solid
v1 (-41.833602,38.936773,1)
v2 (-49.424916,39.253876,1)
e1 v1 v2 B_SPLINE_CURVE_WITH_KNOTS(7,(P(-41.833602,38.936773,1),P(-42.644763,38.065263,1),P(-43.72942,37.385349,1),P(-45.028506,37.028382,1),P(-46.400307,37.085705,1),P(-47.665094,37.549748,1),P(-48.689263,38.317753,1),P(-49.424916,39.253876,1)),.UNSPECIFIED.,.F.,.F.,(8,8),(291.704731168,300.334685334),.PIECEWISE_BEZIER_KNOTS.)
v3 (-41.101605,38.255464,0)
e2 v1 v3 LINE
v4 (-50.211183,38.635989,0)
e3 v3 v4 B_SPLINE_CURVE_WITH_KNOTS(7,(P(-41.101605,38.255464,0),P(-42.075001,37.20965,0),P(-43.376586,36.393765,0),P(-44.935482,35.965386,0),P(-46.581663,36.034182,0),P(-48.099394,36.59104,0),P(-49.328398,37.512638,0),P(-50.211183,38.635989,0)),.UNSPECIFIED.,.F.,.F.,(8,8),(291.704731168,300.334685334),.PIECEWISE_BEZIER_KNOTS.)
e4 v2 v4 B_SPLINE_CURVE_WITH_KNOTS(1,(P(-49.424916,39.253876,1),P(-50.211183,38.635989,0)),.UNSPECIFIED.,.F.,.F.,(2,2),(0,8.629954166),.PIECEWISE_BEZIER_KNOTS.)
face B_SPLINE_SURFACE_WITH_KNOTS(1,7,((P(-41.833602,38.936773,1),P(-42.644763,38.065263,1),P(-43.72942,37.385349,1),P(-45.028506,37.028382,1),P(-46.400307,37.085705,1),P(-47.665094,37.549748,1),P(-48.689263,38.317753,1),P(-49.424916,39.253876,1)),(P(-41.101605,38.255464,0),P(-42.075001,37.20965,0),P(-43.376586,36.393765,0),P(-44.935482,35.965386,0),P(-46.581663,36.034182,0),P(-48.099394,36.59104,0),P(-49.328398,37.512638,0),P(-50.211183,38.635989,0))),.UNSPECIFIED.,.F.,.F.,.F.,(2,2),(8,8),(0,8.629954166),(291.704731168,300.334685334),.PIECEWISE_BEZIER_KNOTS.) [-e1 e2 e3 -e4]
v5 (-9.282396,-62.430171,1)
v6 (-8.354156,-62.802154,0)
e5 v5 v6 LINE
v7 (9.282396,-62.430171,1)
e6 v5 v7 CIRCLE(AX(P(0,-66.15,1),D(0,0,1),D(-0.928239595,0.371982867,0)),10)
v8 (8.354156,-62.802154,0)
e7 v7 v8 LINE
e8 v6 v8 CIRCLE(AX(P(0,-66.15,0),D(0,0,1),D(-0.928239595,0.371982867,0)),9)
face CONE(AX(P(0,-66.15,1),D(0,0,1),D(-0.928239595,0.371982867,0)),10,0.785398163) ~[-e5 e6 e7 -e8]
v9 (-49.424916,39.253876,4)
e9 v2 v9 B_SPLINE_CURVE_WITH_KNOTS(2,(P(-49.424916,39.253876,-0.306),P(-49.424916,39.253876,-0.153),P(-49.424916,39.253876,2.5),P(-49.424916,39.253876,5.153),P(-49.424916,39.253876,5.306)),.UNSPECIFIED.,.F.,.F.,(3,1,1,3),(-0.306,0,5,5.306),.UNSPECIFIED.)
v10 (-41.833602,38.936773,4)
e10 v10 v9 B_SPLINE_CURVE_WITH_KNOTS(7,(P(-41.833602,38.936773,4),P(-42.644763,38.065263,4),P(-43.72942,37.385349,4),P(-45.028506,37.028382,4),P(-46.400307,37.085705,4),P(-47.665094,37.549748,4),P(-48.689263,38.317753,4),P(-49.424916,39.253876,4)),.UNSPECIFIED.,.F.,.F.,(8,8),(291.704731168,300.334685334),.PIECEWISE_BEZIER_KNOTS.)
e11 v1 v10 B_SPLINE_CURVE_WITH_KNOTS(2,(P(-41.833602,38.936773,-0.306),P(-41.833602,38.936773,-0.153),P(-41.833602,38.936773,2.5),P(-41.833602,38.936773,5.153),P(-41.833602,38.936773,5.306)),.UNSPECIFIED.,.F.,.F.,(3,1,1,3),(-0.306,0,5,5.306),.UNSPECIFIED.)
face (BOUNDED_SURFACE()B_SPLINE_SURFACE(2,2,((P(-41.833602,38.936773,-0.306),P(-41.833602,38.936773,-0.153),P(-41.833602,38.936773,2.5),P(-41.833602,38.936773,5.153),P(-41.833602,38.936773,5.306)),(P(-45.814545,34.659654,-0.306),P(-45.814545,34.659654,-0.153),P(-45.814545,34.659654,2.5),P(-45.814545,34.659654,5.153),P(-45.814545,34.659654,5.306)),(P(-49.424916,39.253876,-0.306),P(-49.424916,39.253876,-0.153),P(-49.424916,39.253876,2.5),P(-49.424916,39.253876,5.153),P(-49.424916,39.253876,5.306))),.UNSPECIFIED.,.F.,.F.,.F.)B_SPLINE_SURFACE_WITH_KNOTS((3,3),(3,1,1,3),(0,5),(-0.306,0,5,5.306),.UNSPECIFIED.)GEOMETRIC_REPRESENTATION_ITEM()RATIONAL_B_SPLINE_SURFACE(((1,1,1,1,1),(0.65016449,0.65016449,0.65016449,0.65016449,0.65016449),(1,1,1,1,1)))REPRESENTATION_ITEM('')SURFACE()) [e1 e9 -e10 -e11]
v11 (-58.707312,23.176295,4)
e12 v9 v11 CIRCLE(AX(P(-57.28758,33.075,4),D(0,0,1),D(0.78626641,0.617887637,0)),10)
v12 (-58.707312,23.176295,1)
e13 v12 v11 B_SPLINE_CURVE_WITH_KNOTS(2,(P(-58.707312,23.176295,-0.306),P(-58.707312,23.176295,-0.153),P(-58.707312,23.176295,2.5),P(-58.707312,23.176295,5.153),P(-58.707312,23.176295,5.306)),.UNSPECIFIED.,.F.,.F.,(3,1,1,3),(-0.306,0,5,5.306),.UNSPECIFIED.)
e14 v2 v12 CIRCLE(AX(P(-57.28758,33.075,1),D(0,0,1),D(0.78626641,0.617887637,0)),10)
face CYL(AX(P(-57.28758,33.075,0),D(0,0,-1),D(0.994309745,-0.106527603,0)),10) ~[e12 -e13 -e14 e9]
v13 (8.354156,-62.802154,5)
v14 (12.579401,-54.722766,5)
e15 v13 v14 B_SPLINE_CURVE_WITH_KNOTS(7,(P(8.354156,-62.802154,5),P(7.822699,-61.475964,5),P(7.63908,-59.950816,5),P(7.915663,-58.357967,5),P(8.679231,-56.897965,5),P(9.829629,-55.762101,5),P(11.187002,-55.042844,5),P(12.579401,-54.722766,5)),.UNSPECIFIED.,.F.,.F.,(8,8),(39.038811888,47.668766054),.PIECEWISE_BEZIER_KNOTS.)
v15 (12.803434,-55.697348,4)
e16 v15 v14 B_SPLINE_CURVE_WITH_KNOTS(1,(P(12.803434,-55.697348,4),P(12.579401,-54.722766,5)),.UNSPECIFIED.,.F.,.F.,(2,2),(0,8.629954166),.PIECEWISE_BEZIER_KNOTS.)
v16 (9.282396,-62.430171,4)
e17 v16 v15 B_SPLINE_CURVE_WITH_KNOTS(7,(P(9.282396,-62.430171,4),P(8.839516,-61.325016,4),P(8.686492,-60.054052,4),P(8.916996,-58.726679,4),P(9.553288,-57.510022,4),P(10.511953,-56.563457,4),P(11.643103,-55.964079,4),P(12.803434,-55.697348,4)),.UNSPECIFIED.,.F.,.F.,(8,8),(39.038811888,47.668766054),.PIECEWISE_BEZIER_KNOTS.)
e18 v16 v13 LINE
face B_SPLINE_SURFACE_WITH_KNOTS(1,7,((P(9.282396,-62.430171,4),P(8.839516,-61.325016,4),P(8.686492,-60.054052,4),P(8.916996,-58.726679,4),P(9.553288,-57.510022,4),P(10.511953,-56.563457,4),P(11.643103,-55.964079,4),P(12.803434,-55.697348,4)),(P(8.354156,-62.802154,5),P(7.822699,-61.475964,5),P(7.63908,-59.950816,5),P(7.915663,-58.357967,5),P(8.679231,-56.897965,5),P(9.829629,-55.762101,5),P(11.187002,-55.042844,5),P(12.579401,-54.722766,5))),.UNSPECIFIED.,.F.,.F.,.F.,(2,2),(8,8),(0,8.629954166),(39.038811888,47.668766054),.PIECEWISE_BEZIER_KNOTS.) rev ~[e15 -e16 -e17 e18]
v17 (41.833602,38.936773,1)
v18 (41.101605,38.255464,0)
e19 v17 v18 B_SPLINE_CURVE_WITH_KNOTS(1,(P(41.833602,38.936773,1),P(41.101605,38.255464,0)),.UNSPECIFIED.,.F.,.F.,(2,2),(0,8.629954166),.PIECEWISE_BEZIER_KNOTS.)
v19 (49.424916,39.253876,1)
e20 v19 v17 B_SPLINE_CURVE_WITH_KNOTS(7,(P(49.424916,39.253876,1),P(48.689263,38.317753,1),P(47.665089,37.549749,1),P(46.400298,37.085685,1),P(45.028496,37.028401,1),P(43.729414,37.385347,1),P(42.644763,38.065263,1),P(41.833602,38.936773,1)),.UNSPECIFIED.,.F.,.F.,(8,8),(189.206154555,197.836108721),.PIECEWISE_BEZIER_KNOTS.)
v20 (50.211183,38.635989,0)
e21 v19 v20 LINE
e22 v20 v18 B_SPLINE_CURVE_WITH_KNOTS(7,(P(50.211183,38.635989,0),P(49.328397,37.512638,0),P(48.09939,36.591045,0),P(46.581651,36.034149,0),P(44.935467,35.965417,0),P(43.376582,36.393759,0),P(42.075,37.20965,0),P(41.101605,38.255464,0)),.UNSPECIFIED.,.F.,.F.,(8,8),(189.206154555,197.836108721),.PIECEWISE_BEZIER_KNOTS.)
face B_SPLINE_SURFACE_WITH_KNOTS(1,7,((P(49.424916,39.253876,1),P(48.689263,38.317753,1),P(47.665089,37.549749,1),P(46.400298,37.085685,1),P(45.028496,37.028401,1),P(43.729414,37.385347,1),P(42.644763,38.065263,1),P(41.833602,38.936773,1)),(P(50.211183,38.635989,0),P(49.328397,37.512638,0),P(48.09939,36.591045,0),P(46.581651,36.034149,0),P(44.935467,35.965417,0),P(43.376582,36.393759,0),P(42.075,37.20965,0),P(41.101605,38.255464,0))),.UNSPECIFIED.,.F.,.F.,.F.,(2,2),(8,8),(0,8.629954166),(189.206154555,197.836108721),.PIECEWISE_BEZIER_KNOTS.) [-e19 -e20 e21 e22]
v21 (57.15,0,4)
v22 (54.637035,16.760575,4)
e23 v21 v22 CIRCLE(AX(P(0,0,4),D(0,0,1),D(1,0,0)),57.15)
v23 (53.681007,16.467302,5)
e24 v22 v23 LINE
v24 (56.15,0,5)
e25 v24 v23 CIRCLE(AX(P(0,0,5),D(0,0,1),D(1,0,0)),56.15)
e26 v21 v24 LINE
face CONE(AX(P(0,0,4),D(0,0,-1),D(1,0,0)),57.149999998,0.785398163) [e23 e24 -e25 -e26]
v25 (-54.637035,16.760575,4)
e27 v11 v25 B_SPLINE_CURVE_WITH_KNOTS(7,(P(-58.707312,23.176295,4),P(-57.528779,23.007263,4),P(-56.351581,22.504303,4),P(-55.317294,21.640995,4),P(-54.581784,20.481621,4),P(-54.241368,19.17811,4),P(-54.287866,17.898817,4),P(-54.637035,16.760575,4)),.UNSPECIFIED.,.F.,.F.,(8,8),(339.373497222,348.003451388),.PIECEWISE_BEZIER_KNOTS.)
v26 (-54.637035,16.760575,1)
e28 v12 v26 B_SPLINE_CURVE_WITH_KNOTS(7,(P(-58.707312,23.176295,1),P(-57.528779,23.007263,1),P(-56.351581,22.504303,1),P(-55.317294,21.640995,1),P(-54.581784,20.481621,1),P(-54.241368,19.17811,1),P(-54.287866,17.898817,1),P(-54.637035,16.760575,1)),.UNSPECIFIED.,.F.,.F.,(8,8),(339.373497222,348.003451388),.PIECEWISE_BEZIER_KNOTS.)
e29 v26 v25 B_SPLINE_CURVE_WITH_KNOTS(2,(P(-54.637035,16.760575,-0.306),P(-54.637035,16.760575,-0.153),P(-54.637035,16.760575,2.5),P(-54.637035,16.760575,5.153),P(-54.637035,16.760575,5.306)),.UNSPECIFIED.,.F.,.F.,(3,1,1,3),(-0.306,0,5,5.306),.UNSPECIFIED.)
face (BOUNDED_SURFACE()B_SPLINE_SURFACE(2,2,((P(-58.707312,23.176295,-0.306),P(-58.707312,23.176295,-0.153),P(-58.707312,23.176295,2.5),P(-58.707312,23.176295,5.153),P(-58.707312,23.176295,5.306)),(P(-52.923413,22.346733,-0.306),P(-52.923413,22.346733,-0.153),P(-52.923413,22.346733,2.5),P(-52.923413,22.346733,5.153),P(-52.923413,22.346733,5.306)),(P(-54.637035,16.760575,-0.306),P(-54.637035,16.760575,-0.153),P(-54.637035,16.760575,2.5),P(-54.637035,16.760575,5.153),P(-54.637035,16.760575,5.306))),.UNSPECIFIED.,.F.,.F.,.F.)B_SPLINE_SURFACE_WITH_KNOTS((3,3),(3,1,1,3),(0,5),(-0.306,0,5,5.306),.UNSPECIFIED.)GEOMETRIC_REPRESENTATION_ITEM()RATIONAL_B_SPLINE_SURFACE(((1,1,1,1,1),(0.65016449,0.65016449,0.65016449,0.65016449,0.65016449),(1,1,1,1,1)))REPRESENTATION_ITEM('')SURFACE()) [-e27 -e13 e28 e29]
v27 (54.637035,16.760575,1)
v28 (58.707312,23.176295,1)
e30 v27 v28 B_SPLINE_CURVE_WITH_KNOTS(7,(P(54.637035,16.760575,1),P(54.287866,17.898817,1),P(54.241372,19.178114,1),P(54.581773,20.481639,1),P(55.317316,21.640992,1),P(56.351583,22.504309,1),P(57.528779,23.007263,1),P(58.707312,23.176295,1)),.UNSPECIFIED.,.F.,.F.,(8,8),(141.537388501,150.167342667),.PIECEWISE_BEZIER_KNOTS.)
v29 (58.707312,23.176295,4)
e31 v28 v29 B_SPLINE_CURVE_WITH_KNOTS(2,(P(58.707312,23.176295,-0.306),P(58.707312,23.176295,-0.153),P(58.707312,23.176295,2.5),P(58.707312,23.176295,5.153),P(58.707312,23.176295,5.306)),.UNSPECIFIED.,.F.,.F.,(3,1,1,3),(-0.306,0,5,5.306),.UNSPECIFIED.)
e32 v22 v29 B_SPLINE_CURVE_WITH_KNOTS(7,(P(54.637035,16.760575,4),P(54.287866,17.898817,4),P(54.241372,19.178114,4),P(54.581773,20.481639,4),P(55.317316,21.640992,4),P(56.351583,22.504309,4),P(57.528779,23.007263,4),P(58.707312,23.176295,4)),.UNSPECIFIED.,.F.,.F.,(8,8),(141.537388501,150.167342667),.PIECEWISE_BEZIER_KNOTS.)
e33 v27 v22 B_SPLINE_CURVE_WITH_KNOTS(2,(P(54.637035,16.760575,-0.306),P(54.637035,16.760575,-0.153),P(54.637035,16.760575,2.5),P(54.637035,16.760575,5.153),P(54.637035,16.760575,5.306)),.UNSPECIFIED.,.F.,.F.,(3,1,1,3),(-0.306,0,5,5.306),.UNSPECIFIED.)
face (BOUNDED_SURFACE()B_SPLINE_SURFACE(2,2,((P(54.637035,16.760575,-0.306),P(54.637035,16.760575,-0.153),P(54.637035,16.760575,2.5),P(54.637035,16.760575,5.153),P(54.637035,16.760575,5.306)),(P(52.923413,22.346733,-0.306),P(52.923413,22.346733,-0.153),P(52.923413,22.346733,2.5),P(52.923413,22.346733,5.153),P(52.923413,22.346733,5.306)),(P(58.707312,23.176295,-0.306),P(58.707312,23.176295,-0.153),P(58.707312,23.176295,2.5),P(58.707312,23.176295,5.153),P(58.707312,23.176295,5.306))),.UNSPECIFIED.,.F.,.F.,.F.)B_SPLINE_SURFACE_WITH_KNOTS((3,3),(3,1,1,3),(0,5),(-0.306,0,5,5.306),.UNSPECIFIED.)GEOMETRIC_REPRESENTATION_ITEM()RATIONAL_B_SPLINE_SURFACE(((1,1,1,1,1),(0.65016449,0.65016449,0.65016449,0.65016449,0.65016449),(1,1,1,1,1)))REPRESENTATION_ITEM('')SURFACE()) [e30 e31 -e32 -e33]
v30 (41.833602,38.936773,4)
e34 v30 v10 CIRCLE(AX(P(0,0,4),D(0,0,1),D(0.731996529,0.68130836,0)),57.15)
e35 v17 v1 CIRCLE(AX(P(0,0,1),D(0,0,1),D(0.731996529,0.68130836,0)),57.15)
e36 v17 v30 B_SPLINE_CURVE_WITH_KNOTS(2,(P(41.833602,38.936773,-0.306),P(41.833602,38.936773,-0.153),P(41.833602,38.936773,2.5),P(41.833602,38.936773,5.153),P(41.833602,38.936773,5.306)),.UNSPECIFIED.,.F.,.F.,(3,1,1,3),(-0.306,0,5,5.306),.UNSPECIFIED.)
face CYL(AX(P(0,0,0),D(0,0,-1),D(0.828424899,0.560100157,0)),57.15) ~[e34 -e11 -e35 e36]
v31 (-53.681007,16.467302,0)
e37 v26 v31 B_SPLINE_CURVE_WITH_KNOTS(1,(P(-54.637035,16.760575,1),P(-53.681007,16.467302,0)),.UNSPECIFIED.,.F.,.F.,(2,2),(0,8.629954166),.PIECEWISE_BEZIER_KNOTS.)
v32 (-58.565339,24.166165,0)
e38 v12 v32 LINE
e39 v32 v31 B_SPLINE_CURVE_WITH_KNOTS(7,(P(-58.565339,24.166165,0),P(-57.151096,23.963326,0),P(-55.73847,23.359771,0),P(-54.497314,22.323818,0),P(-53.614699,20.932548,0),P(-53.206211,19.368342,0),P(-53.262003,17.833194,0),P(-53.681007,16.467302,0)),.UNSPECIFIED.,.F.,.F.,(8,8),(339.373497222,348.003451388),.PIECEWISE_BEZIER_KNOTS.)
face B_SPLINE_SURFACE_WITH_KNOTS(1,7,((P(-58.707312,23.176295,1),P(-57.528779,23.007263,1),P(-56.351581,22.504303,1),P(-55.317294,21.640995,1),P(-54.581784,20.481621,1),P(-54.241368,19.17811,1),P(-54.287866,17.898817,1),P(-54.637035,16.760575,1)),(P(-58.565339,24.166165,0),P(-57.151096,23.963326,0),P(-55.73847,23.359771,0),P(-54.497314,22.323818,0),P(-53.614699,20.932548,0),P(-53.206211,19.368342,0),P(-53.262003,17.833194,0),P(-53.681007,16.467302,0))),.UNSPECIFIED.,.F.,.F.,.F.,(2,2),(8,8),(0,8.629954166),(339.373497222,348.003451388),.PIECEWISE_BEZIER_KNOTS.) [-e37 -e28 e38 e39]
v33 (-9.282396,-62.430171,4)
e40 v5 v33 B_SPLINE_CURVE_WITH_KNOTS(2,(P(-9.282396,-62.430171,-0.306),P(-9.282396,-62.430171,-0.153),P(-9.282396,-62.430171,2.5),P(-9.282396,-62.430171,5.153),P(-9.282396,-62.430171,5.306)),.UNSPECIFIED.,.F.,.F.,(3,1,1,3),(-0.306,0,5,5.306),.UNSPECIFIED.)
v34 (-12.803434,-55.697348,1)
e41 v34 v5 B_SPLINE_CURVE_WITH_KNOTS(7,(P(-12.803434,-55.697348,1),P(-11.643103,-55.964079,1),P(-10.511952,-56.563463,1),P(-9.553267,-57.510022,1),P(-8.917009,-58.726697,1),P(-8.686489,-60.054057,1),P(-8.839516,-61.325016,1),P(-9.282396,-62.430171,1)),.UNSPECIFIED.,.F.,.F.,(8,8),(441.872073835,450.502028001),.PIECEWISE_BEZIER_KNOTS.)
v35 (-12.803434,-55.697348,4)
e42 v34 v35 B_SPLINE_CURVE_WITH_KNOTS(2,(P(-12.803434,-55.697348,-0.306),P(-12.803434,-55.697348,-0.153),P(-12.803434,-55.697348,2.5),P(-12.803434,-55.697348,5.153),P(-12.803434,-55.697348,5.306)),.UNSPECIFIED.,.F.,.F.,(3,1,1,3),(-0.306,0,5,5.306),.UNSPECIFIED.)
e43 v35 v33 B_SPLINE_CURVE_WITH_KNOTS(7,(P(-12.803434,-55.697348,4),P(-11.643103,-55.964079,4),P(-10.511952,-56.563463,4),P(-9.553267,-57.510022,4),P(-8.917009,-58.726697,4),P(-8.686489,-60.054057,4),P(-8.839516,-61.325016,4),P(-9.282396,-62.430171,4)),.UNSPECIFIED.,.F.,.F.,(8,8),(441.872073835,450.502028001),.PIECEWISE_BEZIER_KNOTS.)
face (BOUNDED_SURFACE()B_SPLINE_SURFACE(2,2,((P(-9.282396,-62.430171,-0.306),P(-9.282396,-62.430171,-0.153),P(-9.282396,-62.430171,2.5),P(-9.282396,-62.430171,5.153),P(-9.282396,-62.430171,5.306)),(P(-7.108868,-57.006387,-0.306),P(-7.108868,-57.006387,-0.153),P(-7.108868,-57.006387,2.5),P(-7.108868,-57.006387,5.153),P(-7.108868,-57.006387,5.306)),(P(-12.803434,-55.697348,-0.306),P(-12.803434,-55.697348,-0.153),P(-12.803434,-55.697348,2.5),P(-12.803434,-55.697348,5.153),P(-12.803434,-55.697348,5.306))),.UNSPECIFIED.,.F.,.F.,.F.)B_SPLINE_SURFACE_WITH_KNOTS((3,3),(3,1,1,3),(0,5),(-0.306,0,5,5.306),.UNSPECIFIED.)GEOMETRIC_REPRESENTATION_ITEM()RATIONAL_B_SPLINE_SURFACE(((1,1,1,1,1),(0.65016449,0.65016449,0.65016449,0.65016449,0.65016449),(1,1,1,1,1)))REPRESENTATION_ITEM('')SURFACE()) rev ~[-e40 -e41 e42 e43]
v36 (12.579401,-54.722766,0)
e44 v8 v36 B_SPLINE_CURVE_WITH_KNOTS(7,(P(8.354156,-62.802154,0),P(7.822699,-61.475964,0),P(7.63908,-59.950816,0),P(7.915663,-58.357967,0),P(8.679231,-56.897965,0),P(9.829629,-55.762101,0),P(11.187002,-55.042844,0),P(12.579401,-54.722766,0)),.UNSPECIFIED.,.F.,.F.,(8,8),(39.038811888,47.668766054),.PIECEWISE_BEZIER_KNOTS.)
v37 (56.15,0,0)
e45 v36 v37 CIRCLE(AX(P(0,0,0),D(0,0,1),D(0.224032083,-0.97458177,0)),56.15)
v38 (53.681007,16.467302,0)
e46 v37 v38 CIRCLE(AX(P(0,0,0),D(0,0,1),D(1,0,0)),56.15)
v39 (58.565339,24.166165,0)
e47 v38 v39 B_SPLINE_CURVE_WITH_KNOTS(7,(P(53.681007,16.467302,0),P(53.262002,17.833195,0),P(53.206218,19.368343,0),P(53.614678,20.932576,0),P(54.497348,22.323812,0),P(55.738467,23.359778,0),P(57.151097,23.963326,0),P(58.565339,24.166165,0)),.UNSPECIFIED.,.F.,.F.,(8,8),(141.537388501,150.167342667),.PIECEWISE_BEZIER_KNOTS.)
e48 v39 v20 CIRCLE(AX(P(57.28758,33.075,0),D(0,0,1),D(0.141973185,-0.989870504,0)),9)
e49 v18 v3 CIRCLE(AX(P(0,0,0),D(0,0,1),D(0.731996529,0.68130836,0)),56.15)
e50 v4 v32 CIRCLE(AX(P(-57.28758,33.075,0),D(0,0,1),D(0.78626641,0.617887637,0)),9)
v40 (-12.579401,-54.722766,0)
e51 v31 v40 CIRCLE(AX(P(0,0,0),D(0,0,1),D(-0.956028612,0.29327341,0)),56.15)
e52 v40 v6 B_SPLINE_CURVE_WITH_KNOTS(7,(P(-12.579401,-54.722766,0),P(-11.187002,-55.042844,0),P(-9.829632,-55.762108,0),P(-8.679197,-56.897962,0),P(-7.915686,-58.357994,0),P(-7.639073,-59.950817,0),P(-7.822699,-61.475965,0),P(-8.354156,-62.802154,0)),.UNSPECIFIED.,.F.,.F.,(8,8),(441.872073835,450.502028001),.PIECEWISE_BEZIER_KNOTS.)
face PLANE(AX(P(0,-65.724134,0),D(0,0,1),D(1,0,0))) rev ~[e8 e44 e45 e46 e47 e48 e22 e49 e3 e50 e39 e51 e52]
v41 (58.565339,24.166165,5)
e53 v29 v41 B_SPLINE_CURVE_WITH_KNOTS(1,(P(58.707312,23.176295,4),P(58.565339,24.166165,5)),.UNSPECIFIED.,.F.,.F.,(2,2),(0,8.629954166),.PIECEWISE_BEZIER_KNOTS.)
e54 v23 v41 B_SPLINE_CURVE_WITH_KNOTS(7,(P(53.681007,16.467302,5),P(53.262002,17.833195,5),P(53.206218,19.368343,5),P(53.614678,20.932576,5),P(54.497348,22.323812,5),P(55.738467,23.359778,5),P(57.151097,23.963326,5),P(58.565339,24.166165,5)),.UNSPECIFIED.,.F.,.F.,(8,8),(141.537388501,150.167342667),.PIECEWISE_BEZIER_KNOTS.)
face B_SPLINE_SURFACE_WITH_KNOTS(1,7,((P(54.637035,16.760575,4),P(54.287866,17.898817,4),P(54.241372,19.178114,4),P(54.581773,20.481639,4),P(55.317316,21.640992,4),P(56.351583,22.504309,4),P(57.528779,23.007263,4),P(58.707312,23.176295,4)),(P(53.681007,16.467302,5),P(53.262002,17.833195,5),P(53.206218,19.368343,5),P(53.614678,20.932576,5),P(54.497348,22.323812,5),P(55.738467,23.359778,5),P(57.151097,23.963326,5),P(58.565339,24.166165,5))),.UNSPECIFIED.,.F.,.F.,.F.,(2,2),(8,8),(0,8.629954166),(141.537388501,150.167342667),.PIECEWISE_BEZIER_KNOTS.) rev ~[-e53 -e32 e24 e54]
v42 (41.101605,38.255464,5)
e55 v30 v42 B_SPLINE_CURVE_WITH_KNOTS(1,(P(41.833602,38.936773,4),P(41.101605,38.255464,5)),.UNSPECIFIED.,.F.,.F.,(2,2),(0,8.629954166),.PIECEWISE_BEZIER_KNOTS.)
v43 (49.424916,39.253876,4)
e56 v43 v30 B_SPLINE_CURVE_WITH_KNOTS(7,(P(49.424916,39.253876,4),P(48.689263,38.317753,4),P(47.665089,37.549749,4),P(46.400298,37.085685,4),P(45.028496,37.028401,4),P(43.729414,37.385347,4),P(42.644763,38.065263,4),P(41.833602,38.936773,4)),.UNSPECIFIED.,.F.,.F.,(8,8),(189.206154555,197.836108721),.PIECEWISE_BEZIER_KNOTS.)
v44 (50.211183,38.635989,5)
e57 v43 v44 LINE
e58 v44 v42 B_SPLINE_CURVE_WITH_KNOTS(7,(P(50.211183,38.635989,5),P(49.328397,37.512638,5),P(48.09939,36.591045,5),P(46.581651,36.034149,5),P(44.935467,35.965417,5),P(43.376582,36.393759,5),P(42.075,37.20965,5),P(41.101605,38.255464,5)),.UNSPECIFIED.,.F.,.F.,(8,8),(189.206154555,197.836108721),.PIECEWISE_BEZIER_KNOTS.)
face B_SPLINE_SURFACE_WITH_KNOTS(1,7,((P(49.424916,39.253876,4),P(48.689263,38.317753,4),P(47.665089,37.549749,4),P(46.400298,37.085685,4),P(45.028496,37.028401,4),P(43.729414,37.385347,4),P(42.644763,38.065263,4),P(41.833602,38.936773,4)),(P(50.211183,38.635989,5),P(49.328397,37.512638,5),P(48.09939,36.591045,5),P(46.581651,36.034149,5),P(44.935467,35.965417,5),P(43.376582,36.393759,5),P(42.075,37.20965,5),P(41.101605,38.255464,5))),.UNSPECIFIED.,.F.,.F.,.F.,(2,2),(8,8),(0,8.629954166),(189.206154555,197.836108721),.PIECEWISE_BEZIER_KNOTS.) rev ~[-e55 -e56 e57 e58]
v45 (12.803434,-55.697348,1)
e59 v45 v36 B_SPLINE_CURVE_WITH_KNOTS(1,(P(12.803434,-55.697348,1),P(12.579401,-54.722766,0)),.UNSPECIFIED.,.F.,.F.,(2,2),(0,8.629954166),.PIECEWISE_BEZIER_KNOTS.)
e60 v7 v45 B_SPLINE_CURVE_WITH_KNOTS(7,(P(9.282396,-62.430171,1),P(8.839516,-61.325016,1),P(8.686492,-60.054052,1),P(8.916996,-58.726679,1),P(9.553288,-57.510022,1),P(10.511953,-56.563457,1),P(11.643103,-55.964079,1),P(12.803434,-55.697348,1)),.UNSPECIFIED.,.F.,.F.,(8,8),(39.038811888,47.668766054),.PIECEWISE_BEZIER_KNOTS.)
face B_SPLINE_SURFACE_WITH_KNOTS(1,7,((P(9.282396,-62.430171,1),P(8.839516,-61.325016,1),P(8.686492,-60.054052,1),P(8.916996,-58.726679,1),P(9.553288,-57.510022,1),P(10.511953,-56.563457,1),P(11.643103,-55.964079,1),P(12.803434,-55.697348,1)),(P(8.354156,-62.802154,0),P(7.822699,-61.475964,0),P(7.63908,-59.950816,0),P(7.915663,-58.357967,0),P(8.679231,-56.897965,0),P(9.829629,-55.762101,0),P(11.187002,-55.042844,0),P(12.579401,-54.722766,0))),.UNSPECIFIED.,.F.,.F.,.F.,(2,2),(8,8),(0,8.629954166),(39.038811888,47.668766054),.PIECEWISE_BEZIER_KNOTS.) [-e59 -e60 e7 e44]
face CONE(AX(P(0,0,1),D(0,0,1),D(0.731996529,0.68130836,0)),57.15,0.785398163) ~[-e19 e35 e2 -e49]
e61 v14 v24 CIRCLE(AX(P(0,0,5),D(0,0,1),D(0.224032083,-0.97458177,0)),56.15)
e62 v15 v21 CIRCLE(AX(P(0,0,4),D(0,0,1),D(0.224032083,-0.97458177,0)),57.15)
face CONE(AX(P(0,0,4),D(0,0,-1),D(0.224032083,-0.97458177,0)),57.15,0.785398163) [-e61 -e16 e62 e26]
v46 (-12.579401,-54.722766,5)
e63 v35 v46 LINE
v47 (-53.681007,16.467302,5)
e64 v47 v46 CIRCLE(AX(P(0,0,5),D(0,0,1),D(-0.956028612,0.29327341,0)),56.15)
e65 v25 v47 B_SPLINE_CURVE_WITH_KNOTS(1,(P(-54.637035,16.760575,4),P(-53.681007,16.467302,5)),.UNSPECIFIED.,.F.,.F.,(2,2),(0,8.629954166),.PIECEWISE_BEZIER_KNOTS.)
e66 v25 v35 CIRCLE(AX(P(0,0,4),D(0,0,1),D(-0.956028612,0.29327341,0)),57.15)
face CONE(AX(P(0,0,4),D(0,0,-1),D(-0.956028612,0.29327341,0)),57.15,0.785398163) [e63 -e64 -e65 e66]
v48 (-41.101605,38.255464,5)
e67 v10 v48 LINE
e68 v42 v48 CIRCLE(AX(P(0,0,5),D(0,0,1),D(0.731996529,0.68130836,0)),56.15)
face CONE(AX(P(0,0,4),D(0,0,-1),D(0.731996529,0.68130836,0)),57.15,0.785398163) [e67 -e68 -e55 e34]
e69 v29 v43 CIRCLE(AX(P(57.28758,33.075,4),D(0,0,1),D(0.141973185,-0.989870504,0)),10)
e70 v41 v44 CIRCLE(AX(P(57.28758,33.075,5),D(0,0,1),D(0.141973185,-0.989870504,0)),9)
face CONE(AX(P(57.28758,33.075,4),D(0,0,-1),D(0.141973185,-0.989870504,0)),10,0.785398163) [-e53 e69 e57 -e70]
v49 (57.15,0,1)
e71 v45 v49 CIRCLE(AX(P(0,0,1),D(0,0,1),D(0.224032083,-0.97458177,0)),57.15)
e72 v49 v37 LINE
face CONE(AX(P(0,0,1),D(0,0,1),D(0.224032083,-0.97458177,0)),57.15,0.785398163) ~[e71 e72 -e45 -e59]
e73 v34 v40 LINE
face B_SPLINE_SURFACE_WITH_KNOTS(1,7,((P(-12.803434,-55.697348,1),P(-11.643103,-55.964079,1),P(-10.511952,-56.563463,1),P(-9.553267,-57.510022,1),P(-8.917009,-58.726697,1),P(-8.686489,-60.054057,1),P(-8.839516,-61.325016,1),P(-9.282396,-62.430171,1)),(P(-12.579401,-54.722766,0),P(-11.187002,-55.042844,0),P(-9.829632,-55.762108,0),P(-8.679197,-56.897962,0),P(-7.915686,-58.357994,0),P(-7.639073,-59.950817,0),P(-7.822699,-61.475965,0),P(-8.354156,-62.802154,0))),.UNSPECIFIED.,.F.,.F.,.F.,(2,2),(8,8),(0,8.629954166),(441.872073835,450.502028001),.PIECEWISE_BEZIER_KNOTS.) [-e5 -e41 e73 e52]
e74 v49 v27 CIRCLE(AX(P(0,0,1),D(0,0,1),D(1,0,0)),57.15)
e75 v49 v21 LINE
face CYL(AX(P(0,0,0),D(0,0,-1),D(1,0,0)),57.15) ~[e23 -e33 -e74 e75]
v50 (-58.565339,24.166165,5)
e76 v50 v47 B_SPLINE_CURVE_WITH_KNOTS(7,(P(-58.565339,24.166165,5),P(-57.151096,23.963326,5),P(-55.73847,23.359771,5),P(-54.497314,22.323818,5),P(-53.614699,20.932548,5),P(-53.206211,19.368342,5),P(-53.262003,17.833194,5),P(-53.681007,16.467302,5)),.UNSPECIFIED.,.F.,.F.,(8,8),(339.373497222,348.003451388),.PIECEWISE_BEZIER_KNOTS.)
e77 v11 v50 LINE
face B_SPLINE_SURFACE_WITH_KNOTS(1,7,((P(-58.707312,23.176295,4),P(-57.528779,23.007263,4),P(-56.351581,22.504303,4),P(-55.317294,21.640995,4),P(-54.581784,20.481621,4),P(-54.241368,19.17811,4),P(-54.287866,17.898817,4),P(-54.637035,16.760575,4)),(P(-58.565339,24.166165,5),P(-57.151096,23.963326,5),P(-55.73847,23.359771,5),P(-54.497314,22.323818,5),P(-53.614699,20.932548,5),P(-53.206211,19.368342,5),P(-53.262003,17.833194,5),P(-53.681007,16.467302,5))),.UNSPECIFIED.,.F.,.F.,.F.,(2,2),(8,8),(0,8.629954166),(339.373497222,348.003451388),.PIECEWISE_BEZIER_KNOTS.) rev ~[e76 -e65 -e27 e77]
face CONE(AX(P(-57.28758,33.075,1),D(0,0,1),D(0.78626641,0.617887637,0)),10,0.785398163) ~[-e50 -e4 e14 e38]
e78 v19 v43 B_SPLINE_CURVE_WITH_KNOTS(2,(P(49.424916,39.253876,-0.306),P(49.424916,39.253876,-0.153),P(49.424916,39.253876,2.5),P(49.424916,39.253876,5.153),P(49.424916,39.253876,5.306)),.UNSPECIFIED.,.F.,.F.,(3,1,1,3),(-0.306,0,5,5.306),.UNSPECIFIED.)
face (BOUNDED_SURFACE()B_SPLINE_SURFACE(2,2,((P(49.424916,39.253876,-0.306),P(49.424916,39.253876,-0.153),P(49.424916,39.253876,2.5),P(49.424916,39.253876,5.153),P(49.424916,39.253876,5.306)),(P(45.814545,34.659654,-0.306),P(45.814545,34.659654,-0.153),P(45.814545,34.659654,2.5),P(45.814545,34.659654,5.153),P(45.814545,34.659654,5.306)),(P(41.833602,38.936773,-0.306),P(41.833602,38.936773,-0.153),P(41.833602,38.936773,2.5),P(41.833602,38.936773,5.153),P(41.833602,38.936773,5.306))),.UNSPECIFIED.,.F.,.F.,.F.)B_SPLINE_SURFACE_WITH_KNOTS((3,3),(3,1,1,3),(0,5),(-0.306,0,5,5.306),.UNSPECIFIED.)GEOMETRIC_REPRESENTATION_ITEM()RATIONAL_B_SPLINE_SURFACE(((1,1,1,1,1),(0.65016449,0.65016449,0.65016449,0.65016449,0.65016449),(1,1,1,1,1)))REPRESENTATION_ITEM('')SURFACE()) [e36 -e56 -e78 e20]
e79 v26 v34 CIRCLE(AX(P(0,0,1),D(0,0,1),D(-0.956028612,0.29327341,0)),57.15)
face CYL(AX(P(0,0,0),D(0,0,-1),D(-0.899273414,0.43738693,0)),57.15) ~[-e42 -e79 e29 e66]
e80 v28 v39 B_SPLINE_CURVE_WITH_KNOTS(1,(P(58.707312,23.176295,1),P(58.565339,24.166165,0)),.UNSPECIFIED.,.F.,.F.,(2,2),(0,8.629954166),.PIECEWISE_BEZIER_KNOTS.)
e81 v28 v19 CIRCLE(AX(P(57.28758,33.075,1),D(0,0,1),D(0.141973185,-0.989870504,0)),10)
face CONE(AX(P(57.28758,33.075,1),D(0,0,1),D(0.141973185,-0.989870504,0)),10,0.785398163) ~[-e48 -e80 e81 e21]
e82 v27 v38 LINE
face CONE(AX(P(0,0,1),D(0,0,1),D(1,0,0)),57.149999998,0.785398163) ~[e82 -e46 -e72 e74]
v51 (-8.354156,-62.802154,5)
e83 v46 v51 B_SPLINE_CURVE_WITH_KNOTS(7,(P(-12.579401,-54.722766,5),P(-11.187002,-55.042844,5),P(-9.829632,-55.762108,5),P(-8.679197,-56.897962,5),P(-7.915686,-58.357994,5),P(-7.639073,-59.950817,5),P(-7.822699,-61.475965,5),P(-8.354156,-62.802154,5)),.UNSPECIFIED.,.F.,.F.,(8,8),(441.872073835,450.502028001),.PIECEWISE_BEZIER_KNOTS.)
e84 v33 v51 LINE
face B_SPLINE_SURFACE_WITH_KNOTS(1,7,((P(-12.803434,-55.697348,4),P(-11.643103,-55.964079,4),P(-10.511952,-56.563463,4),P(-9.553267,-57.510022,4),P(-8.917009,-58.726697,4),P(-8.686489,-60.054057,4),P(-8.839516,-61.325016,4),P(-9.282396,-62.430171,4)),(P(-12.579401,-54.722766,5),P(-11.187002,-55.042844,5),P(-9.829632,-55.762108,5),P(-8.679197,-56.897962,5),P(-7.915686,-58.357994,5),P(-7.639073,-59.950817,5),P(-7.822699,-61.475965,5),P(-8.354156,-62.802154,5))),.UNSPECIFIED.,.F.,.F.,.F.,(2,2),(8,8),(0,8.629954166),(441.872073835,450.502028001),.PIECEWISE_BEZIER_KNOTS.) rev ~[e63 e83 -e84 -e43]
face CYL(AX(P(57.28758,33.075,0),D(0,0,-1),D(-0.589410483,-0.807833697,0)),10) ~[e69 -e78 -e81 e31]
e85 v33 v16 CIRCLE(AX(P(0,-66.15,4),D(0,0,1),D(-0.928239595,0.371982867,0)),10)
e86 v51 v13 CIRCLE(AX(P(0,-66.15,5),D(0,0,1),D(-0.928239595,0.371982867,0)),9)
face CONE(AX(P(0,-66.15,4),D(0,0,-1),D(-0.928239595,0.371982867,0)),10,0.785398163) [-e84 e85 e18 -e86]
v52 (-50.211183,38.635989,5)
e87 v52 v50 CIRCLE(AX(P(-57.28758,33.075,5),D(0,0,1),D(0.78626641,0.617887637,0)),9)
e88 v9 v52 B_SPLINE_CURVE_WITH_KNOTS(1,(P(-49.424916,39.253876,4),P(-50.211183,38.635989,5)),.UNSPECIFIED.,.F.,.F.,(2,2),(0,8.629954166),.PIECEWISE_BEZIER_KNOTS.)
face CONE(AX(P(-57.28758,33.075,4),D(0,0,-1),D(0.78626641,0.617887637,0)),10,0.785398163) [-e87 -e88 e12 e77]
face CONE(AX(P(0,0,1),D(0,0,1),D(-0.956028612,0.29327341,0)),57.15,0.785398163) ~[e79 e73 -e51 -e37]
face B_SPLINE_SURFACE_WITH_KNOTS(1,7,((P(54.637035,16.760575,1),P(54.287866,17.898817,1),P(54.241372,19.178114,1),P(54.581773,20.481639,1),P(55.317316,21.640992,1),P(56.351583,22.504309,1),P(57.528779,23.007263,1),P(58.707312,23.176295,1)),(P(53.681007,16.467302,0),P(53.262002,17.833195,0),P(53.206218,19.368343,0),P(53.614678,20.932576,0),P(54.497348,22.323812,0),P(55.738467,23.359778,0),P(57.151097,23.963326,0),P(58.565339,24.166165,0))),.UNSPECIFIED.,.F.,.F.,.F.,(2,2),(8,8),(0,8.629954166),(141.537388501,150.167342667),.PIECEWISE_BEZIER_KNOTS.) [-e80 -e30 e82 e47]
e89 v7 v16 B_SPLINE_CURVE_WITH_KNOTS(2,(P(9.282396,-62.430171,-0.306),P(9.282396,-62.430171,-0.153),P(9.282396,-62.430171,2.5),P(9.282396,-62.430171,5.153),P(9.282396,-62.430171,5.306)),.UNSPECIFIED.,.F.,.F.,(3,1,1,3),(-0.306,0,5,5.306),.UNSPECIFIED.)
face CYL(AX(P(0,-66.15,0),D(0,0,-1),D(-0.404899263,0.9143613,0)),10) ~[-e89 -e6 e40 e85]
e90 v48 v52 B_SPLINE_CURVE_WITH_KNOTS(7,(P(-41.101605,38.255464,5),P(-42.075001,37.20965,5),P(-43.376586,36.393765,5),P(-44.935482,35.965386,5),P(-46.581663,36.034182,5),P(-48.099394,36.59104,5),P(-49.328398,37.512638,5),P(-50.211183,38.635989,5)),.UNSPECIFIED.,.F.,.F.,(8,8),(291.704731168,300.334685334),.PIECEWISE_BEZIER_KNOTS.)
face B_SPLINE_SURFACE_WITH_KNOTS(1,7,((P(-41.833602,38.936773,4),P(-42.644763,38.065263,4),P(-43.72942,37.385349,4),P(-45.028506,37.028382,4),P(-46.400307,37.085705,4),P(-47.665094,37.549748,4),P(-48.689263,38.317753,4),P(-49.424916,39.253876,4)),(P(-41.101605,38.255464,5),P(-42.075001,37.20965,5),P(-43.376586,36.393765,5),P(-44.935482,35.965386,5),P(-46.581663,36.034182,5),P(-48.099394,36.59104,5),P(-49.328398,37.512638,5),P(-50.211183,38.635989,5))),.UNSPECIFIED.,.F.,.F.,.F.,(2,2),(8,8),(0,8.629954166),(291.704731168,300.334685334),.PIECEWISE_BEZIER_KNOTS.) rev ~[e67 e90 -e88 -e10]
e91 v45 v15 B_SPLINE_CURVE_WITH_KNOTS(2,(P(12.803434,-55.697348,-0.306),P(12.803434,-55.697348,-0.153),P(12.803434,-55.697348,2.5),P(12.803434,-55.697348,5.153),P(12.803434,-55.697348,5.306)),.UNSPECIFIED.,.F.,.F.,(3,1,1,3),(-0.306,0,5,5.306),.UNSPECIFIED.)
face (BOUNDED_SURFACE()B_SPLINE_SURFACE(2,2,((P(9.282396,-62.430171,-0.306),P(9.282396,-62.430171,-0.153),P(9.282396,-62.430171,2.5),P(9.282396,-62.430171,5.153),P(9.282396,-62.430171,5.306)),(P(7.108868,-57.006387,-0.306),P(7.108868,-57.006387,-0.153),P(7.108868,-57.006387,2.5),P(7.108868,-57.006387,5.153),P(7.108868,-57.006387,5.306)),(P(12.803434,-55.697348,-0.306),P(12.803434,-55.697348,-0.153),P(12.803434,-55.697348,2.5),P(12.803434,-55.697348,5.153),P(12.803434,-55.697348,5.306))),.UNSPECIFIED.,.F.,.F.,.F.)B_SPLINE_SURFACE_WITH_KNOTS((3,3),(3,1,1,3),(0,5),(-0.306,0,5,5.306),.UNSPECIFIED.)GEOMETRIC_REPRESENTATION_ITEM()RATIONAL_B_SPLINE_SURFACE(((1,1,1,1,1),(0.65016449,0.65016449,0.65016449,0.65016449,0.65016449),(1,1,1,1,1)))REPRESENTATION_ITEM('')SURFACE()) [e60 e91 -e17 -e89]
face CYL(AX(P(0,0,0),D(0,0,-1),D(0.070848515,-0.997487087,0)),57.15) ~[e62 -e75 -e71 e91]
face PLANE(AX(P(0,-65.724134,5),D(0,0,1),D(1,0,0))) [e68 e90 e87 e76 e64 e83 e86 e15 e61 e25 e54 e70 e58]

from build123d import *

# Parameters (mm, degrees)
F1_DEPTH = 5
F2_R     = 5
F3_SIZE  = 1


with BuildPart() as f1:
    # F0 (on Top) → F1 (new body)
    with BuildSketch(Plane.XY):
        with BuildLine():
            ThreePointArc((-4.0489926269, -57.0063869992), (0, -76.15), (4.0489926269, -57.0063869992))
            ThreePointArc((4.0489926269, -57.0063869992), (0, -57.15), (-4.0489926269, -57.0063869992))
        make_face()
        with BuildLine():
            ThreePointArc((4.0489926269, -57.0063869992), (41.8181923846, -38.9533218826), (57.15, 0))
            ThreePointArc((57.15, 0), (55.6922778867, 12.8254701198), (51.3934756327, 24.996663025))
            ThreePointArc((51.3934756327, 24.996663025), (49.4933518263, 28.575), (47.3444830059, 32.0097239742))
            ThreePointArc((47.3444830059, 32.0097239742), (0, 57.15), (-47.3444830059, 32.0097239742))
            ThreePointArc((-47.3444830059, 32.0097239742), (-49.4933518263, 28.575), (-51.3934756327, 24.996663025))
            ThreePointArc((-51.3934756327, 24.996663025), (-49.4933518263, -28.575), (-4.0489926269, -57.0063869992))
            ThreePointArc((-4.0489926269, -57.0063869992), (0, -57.15), (4.0489926269, -57.0063869992))
        make_face()
        with BuildLine():
            ThreePointArc((-51.3934756327, 24.996663025), (-49.4933518263, 28.575), (-47.3444830059, 32.0097239742))
            ThreePointArc((-47.3444830059, 32.0097239742), (-65.9478344982, 38.075), (-51.3934756327, 24.996663025))
        make_face()
        with BuildLine():
            ThreePointArc((47.3444830059, 32.0097239742), (49.4933518263, 28.575), (51.3934756327, 24.996663025))
            ThreePointArc((51.3934756327, 24.996663025), (65.9478344982, 38.075), (47.3444830059, 32.0097239742))
        make_face()
    extrude(amount=F1_DEPTH)

    # F2
    f2_edges = [f1.edges().sort_by_distance(p)[0] for p in [
        (-4.048993, -57.006387, 2.5),
        (51.393476, 24.996663, 2.5),
        (-47.344483, 32.009724, 2.5),
        (4.048993, -57.006387, 2.5),
        (47.344483, 32.009724, 2.5),
        (-51.393476, 24.996663, 2.5),
    ]]
    fillet(f2_edges, radius=F2_R)

    # F3
    f3_edges = [f1.edges().sort_by_distance(p)[0] for p in [
        (0, -76.15, 5),
        (-9.492901, -58.253155, 5),
        (9.492901, -58.253155, 5),
        (-49.493352, -28.575, 5),
        (49.493352, -28.575, 5),
        (-55.195163, 20.905484, 5),
        (55.195163, 20.905484, 5),
        (-65.947834, 38.075, 5),
        (65.947834, 38.075, 5),
        (-45.702262, 37.347671, 5),
        (45.702262, 37.347671, 5),
        (0, 57.15, 5),
        (0, -76.15, 0),
        (-9.492901, -58.253155, 0),
        (9.492901, -58.253155, 0),
        (-49.493352, -28.575, 0),
        (49.493352, -28.575, 0),
        (-55.195163, 20.905484, 0),
        (55.195163, 20.905484, 0),
        (-65.947834, 38.075, 0),
        (65.947834, 38.075, 0),
        (-45.702262, 37.347671, 0),
        (45.702262, 37.347671, 0),
        (0, 57.15, 0),
    ]]
    chamfer(f3_edges, length=F3_SIZE)


solid = f1.part
